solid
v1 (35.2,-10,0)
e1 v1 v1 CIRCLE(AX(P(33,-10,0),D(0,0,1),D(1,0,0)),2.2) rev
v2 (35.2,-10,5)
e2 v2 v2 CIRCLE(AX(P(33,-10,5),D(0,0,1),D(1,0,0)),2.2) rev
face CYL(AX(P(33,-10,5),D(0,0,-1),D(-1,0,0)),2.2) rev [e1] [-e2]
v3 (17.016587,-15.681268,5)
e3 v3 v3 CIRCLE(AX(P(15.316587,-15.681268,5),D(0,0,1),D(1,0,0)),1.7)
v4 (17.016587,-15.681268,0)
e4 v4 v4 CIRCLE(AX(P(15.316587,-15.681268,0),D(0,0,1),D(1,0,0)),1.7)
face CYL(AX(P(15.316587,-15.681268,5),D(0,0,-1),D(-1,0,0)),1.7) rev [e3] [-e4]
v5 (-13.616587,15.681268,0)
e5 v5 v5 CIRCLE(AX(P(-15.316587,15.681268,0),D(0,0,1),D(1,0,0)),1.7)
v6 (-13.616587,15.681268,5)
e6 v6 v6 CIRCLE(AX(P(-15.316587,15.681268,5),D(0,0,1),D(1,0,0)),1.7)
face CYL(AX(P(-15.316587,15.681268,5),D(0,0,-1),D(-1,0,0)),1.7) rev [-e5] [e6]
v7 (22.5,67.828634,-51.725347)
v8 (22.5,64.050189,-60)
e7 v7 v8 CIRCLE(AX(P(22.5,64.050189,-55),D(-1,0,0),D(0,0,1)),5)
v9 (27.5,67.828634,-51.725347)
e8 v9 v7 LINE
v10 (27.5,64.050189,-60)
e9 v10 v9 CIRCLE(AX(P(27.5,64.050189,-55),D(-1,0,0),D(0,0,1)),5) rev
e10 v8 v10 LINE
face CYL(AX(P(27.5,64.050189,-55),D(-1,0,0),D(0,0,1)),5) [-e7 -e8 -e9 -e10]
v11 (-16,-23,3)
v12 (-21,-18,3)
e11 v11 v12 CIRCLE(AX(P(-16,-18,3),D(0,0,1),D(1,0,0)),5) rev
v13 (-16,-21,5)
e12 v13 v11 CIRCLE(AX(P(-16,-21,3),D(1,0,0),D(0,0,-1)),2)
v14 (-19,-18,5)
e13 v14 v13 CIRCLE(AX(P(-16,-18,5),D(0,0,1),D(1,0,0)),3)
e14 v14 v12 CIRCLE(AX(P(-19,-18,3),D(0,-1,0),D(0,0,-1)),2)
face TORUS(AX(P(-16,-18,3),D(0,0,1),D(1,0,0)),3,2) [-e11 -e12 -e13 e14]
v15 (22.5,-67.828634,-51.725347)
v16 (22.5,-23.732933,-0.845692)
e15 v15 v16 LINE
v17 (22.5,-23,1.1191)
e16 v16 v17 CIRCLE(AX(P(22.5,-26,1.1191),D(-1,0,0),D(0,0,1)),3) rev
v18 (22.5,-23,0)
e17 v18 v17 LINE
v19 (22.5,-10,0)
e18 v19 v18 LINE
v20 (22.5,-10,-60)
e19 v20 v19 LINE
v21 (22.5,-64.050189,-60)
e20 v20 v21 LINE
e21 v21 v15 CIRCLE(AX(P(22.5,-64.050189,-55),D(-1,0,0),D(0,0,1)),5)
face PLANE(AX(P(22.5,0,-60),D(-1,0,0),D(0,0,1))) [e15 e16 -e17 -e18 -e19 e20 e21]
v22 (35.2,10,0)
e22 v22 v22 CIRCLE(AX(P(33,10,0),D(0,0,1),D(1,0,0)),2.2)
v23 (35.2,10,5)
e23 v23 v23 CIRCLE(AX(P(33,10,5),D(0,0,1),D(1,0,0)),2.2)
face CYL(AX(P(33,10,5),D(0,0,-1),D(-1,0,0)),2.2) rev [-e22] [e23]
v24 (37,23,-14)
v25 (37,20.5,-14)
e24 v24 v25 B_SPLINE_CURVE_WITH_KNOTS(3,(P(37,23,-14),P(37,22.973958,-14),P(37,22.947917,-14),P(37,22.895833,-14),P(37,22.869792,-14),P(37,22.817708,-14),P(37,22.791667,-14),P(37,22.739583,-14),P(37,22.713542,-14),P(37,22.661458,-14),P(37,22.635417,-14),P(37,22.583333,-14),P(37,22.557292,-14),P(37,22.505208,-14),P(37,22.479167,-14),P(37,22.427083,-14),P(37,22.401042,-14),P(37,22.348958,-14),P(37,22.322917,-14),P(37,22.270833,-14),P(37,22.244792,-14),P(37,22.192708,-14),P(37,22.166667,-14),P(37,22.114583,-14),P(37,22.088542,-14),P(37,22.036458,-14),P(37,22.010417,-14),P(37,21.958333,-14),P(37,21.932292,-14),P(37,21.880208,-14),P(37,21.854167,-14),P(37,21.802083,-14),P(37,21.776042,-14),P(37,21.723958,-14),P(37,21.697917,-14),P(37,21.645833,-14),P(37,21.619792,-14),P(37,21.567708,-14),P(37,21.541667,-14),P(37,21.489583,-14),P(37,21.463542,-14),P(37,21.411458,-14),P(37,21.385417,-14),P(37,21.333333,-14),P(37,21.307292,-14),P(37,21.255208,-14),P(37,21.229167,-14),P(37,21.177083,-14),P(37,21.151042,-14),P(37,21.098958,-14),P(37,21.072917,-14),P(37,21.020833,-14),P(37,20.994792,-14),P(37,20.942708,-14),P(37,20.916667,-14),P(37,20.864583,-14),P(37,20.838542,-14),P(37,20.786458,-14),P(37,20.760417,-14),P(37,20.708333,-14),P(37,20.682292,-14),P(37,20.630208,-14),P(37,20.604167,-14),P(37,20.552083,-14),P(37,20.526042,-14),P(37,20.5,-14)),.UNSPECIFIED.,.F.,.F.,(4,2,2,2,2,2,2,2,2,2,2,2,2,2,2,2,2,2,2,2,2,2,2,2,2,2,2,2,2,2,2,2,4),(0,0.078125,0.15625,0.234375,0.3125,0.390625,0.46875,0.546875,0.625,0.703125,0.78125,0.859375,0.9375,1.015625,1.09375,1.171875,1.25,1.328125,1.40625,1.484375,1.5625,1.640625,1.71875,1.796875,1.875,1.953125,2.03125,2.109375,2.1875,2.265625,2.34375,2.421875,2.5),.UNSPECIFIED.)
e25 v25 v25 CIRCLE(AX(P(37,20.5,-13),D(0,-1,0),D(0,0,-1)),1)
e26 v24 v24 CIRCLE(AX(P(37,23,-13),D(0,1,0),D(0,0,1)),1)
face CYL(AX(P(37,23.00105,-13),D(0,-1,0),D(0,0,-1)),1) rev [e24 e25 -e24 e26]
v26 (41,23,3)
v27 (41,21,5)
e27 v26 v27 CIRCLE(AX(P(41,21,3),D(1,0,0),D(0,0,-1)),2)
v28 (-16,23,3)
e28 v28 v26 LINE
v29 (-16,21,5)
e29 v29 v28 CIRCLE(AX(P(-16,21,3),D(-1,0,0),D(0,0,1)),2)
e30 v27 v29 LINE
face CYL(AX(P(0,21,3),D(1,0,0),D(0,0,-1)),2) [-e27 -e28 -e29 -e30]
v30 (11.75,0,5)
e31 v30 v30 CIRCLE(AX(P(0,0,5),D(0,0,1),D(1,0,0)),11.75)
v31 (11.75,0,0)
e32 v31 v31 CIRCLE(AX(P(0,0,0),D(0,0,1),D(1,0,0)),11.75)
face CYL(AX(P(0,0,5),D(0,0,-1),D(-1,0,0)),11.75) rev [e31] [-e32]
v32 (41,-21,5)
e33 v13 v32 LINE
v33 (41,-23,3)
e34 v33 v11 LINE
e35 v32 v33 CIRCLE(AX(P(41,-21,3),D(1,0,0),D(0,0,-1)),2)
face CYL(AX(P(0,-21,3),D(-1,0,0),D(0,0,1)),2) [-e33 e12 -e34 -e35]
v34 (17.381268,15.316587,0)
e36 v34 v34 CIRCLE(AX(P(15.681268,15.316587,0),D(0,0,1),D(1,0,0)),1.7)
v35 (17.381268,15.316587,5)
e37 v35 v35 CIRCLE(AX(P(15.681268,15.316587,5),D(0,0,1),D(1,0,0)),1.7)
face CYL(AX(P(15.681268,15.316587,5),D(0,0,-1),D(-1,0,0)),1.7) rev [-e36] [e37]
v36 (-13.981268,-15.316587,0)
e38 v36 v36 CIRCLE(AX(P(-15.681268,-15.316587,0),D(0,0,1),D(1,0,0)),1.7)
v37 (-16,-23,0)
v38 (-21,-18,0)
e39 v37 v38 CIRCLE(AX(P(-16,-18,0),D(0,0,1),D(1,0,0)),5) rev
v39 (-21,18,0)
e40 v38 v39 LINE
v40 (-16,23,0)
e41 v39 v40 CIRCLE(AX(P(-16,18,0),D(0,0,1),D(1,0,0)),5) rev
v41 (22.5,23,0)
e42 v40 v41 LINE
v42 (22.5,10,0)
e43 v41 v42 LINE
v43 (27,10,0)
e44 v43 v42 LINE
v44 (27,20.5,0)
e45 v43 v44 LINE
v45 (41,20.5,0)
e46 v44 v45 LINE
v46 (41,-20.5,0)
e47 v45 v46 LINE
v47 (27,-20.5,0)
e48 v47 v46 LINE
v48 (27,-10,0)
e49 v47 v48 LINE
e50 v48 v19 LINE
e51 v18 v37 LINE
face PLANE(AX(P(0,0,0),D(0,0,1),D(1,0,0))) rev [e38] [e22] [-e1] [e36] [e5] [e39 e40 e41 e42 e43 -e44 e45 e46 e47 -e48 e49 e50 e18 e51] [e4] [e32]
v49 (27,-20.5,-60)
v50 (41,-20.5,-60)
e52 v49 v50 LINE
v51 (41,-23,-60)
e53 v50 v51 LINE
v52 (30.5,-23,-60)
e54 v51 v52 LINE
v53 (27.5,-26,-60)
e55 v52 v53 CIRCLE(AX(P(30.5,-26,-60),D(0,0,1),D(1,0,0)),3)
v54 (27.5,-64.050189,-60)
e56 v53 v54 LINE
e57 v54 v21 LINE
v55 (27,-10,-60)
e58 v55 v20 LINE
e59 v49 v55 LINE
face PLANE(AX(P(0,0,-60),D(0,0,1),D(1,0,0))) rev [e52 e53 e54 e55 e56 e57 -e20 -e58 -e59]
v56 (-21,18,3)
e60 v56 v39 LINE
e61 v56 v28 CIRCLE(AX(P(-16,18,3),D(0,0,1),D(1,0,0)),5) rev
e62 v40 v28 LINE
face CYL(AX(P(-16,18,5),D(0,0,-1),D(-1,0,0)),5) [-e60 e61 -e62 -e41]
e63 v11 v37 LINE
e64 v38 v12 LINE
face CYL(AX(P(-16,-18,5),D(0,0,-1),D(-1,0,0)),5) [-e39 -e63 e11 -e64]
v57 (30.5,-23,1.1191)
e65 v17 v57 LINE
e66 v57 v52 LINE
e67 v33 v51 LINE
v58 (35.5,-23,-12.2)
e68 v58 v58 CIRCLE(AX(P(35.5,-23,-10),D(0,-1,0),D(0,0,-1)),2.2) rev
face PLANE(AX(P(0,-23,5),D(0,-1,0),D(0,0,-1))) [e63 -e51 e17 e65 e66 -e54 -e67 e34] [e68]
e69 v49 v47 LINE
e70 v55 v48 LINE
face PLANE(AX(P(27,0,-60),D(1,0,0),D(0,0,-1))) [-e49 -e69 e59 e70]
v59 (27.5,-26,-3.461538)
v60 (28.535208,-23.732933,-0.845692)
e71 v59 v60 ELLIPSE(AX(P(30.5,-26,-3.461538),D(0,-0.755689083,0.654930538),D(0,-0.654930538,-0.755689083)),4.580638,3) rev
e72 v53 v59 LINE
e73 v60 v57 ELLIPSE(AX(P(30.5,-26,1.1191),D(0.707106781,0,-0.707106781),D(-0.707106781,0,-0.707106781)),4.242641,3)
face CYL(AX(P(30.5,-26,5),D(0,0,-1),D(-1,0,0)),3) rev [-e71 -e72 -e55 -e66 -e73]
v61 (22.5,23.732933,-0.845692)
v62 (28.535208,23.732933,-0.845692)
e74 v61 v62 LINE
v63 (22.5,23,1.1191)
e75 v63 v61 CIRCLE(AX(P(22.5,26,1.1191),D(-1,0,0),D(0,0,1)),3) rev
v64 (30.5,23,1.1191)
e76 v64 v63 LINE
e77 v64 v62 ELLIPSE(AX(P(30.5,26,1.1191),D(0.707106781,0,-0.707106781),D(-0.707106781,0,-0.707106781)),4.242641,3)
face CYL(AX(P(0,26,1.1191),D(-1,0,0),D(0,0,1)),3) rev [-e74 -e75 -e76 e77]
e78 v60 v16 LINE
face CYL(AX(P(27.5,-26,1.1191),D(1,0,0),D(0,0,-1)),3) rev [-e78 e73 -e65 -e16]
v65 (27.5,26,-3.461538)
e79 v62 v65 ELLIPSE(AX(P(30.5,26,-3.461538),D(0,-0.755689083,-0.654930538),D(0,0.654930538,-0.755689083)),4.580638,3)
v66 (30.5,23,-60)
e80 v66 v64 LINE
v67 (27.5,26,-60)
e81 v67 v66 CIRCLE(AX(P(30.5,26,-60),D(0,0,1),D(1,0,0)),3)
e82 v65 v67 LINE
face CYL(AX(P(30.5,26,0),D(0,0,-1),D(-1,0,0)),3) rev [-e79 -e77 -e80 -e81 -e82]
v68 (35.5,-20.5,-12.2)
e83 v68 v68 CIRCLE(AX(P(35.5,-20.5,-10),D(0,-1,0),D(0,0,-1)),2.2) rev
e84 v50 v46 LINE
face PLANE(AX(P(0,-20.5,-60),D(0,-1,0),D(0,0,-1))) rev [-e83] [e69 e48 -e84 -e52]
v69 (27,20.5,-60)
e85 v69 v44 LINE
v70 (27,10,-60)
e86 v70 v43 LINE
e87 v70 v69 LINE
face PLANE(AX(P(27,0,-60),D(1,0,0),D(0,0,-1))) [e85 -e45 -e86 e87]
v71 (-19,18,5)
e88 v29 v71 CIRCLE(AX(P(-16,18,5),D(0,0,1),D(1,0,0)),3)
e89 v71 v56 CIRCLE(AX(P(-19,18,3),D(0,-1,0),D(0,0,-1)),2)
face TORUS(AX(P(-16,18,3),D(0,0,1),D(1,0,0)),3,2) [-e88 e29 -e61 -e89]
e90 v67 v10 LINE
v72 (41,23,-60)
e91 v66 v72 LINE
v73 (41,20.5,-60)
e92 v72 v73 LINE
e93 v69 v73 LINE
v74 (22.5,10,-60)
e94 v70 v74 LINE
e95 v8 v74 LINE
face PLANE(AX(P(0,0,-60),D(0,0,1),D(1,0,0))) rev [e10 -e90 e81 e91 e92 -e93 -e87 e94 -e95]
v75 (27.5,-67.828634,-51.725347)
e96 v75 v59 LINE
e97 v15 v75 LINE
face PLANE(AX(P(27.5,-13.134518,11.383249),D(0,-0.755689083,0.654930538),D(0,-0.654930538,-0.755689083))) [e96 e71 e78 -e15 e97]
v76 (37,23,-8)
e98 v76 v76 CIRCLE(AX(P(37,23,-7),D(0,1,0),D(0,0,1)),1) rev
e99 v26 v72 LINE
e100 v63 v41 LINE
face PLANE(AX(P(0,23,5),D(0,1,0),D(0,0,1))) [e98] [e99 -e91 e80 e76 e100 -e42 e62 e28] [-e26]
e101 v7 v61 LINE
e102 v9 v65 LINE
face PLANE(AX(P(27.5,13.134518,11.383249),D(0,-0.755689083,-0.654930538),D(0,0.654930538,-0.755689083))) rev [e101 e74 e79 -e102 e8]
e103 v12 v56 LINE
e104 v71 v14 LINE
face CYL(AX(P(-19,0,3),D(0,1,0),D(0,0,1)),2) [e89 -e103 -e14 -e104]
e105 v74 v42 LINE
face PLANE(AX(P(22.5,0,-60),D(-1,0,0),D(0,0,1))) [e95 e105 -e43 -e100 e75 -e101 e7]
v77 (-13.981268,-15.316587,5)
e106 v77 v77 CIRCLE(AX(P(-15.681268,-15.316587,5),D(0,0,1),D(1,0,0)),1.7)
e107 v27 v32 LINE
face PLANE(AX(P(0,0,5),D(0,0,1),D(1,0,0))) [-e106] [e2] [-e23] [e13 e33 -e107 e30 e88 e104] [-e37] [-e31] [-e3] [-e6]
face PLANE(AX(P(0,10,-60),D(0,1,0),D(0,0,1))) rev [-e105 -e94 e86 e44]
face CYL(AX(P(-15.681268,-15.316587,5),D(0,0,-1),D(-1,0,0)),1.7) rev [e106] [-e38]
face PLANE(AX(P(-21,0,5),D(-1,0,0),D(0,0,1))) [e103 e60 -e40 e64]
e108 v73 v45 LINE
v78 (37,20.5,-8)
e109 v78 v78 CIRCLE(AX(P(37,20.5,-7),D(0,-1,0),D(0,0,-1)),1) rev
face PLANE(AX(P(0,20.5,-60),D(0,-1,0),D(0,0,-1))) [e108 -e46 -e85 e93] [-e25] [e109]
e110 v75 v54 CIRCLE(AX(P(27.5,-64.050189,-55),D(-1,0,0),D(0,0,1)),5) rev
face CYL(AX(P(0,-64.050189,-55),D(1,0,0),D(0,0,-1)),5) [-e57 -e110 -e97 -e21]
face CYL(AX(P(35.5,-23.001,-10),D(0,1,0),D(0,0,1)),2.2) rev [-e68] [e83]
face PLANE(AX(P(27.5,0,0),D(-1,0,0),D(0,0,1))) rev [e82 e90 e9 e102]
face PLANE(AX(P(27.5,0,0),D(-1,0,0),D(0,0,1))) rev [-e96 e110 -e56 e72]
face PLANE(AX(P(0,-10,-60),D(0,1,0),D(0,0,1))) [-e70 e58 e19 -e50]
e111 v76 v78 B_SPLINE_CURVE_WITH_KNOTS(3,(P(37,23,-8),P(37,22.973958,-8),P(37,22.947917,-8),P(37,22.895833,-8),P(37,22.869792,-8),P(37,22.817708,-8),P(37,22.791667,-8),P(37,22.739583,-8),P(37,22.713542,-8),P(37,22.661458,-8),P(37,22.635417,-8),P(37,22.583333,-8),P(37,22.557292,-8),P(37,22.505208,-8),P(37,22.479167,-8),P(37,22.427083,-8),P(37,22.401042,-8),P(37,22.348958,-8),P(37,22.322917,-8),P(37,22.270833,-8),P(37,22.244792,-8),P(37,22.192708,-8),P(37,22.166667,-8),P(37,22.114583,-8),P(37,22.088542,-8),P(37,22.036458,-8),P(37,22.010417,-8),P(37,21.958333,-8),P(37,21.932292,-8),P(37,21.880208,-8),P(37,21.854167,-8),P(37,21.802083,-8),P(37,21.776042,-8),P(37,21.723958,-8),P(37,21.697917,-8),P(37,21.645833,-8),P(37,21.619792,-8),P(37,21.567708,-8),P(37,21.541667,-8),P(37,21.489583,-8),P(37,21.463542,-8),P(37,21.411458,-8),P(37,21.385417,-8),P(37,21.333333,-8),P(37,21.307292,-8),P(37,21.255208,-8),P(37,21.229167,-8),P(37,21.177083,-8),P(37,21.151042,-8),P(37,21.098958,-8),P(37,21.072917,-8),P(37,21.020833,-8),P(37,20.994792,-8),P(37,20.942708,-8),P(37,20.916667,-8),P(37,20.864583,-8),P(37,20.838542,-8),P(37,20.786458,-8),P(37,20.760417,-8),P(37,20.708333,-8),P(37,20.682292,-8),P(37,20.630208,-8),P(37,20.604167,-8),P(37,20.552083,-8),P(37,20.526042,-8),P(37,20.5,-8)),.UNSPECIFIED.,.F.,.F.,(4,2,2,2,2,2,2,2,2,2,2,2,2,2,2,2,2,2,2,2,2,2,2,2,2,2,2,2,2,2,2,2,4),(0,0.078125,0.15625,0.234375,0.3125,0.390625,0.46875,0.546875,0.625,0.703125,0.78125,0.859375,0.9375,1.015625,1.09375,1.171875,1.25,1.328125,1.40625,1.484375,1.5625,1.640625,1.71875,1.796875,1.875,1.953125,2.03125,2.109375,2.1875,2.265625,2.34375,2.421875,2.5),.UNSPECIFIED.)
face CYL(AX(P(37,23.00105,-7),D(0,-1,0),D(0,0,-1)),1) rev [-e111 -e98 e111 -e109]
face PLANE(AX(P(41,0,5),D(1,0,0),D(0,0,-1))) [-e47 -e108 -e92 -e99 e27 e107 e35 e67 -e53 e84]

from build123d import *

# Parameters (mm, degrees)
SKETCH_1_W          = 14
SKETCH_1_H          = 2.5
SKETCH_1_R          = 1.7
SKETCH_1_R_2        = 11.75
SKETCH_1_R_3        = 2.2
SKETCH_1_W_2        = 4.5
SKETCH_1_H_2        = 20
EXTRUDE_1_DEPTH     = 5
EXTRUDE_2_DEPTH     = 60
CUT_EXTRUDE_1_REACH = 78.223
CUT_EXTRUDE_2_REACH = 78.223
SKETCH_2_3_R        = 1
EXTRUDE_3_DEPTH     = 5
FILLET_1_R          = 5
FILLET_START        = 22.5
FILLET_2_DEPTH      = 5
FILLET_START_2      = -60
FILLET_2_2_DEPTH    = 61.119099979
FILLET_START_3      = 27.5
FILLET_2_3_DEPTH    = 3
FILLET_3_R          = 2


with BuildPart() as part:
    # 草图1 → 凸台-拉伸1 (new body)
    # profile 1 of 9: a face of its own
    with BuildSketch(Plane.XY):
        with Locations((34, 21.75)):
            Rectangle(SKETCH_1_W, SKETCH_1_H)
    # profile 2 of 9: a face of its own
    with BuildSketch(Plane.XY):
        Polygon((27, 23), (22.5, 23), (22.5, 21.5), (22.5, 10), (27, 10), (27, 20.5), align=None)
    # profile 3 of 9: a face of its own
    with BuildSketch(Plane.XY):
        Polygon((-21, 23), (-21, 21.5), (21, 21.5), (22.5, 21.5), (22.5, 23), align=None)
    # profile 4 of 9: a face of its own
    with BuildSketch(Plane.XY):
        Polygon((21, 21.5), (-21, 21.5), (-21, -21.5), (21, -21.5), (22.5, -21.5), (22.5, -10), (22.5, 10), (22.5, 21.5), align=None)
        with Locations((-15.68126777, -15.316587124)):
            Circle(SKETCH_1_R, mode=Mode.SUBTRACT)
        with Locations((15.316587124, -15.68126777)):
            Circle(SKETCH_1_R, mode=Mode.SUBTRACT)
        Circle(SKETCH_1_R_2, mode=Mode.SUBTRACT)
        with Locations((-15.316587124, 15.68126777)):
            Circle(SKETCH_1_R, mode=Mode.SUBTRACT)
        with Locations((15.68126777, 15.316587124)):
            Circle(SKETCH_1_R, mode=Mode.SUBTRACT)
    # profile 5 of 9: a face of its own
    with BuildSketch(Plane.XY):
        Polygon((41, 20.5), (27, 20.5), (27, 10), (27, -10), (27, -20.5), (41, -20.5), align=None)
        with Locations((33, -10)):
            Circle(SKETCH_1_R_3, mode=Mode.SUBTRACT)
        with Locations((33, 10)):
            Circle(SKETCH_1_R_3, mode=Mode.SUBTRACT)
    # profile 6 of 9: a face of its own
    with BuildSketch(Plane.XY):
        with Locations((24.75, 0)):
            Rectangle(SKETCH_1_W_2, SKETCH_1_H_2)
    # profile 7 of 9: a face of its own
    with BuildSketch(Plane.XY):
        Polygon((22.5, -10), (22.5, -21.5), (22.5, -23), (27, -23), (27, -20.5), (27, -10), align=None)
    # profile 8 of 9: a face of its own
    with BuildSketch(Plane.XY):
        with Locations((34, -21.75)):
            Rectangle(SKETCH_1_W, SKETCH_1_H)
    # profile 9 of 9: a face of its own
    with BuildSketch(Plane.XY):
        Polygon((21, -21.5), (-21, -21.5), (-21, -23), (22.5, -23), (22.5, -21.5), align=None)
    extrude(amount=EXTRUDE_1_DEPTH)

    # 草图1<4> → 凸台-拉伸2 (add)
    with BuildSketch(Plane.XY):
        Polygon((22.5, 23), (22.5, 10), (27, 10), (27, 20.5), (41, 20.5), (41, 23), align=None)
        Polygon((22.5, -10), (22.5, -23), (41, -23), (41, -20.5), (27, -20.5), (27, -10), align=None)
    extrude(amount=-EXTRUDE_2_DEPTH)

    # 草图2 → 切除-拉伸1 (cut, up to next)
    with BuildSketch(Plane(origin=(0, 0, 0), x_dir=(1, 0, 0), z_dir=(0, 1, 0)), mode=Mode.PRIVATE) as cut_extrude_1_sk1:
        with BuildLine():
            ThreePointArc((37.7, 10), (35.5, 12.2), (33.3, 10))
            Line((33.3, 10), (37.7, 10))
        make_face()
    cut_extrude_1_tool1 = extrude(cut_extrude_1_sk1.sketch, amount=-CUT_EXTRUDE_1_REACH, mode=Mode.PRIVATE) & part.part
    # 草图2 → 切除-拉伸1 (cut, up to next)
    with BuildSketch(Plane(origin=(0, 0, 0), x_dir=(1, 0, 0), z_dir=(0, 1, 0)), mode=Mode.PRIVATE) as cut_extrude_1_sk2:
        with BuildLine():
            Line((37.7, 10), (33.3, 10))
            ThreePointArc((33.3, 10), (35.5, 7.8), (37.7, 10))
        make_face()
    cut_extrude_1_tool2 = extrude(cut_extrude_1_sk2.sketch, amount=-CUT_EXTRUDE_1_REACH, mode=Mode.PRIVATE) & part.part
    # 草图2 → 切除-拉伸1 (cut, up to next)
    with BuildSketch(Plane(origin=(0, 0, 0), x_dir=(1, 0, 0), z_dir=(0, 1, 0)), mode=Mode.PRIVATE) as cut_extrude_1_sk3:
        with BuildLine():
            ThreePointArc((37.7, 10), (35.5, 12.2), (33.3, 10))
            Line((33.3, 10), (37.7, 10))
        make_face()
    cut_extrude_1_tool3 = extrude(cut_extrude_1_sk3.sketch, amount=-CUT_EXTRUDE_1_REACH, mode=Mode.PRIVATE) & part.part
    # 草图2 → 切除-拉伸1 (cut, up to next)
    with BuildSketch(Plane(origin=(0, 0, 0), x_dir=(1, 0, 0), z_dir=(0, 1, 0)), mode=Mode.PRIVATE) as cut_extrude_1_sk4:
        with BuildLine():
            Line((37.7, 10), (33.3, 10))
            ThreePointArc((33.3, 10), (35.5, 7.8), (37.7, 10))
        make_face()
    cut_extrude_1_tool4 = extrude(cut_extrude_1_sk4.sketch, amount=-CUT_EXTRUDE_1_REACH, mode=Mode.PRIVATE) & part.part
    add(cut_extrude_1_tool1.solids().sort_by_distance((35.5, 0, -10.933709))[0], mode=Mode.SUBTRACT)
    add(cut_extrude_1_tool2.solids().sort_by_distance((35.5, 0, -9.066291))[0], mode=Mode.SUBTRACT)
    add(cut_extrude_1_tool3.solids().sort_by_distance((35.5, 0, -10.933709))[0], mode=Mode.SUBTRACT)
    add(cut_extrude_1_tool4.solids().sort_by_distance((35.5, 0, -9.066291))[0], mode=Mode.SUBTRACT)

    # 草图2<3> → 切除-拉伸2 (cut, up to next)
    with BuildSketch(Plane(origin=(0, 0, 0), x_dir=(1, 0, 0), z_dir=(0, 1, 0)), mode=Mode.PRIVATE) as cut_extrude_2_sk1:
        with Locations(Location((37, 7, 0), (0, 0, 90))):
            Circle(SKETCH_2_3_R)
    cut_extrude_2_tool1 = extrude(cut_extrude_2_sk1.sketch, amount=CUT_EXTRUDE_2_REACH, mode=Mode.PRIVATE) & part.part
    # 草图2<3> → 切除-拉伸2 (cut, up to next)
    with BuildSketch(Plane(origin=(0, 0, 0), x_dir=(1, 0, 0), z_dir=(0, 1, 0)), mode=Mode.PRIVATE) as cut_extrude_2_sk2:
        with Locations(Location((37, 13, 0), (0, 0, 90))):
            Circle(SKETCH_2_3_R)
    cut_extrude_2_tool2 = extrude(cut_extrude_2_sk2.sketch, amount=CUT_EXTRUDE_2_REACH, mode=Mode.PRIVATE) & part.part
    add(cut_extrude_2_tool1.solids().sort_by_distance((37, 0, -7))[0], mode=Mode.SUBTRACT)
    add(cut_extrude_2_tool2.solids().sort_by_distance((37, 0, -13))[0], mode=Mode.SUBTRACT)

    # 草图5 → 凸台-拉伸3 (add)
    with BuildSketch(Plane.ZY.offset(-22.5)):
        Polygon((-60, 75), (-60, 23), (0, 23), align=None)
        Polygon((0, -23), (-60, -23), (-60, -75), align=None)
    extrude(amount=-EXTRUDE_3_DEPTH)

    # 圆角1
    fillet_1_edges = [part.edges().sort_by_distance(p)[0] for p in [
        (25, -75, -60),
        (25, 75, -60),
        (-21, -23, 2.5),
        (-21, 23, 2.5),
    ]]
    fillet(fillet_1_edges, radius=FILLET_1_R)

    # 圆角2: read off the stored shape, not the designer's step
    # 圆角2 outline → 圆角2 (add)
    with BuildSketch(Plane.YZ.offset(FILLET_START)):
        with BuildLine():
            ThreePointArc((-23, 1.119099979), (-23.189199247, 0.070577625), (-23.732932752, -0.845691636))
            Line((-23.732932752, -0.845691636), (-23, 0))
            Line((-23, 0), (-23, 1.119099979))
        make_face()
        with BuildLine():
            Line((23, 0), (23.732932752, -0.845691636))
            ThreePointArc((23.732932752, -0.845691636), (23.189199247, 0.070577625), (23, 1.119099979))
            Line((23, 1.119099979), (23, 0))
        make_face()
    extrude(amount=FILLET_2_DEPTH)

    # Fillet 2 2 outline → Fillet 2 2 (add)
    with BuildSketch(Plane.XY.offset(FILLET_START_2)):
        with BuildLine():
            Line((27.5, -23), (27.5, -26))
            ThreePointArc((27.5, -26), (28.378679656, -23.878679656), (30.5, -23))
            Line((30.5, -23), (27.5, -23))
        make_face()
        with BuildLine():
            Line((27.5, 23), (30.5, 23))
            ThreePointArc((30.5, 23), (28.378679656, 23.878679656), (27.5, 26))
            Line((27.5, 26), (27.5, 23))
        make_face()
    extrude(amount=FILLET_2_2_DEPTH)

    # Fillet 2 3 outline → Fillet 2 3 (cut)
    with BuildSketch(Plane.YZ.offset(FILLET_START_3)):
        with BuildLine():
            Line((-27.333333343, -5), (-23.732932752, -0.845691636))
            ThreePointArc((-23.732932752, -0.845691636), (-23.189199247, 0.070577625), (-23, 1.119099979))
            Line((-23, 1.119099979), (-28, 1.119099979))
            Line((-28, 1.119099979), (-28, -5))
            Line((-28, -5), (-27.333333343, -5))
        make_face()
        with BuildLine():
            Line((23.732932752, -0.845691636), (27.333333343, -5))
            Line((27.333333343, -5), (28, -5))
            Line((28, -5), (28, 1.119099979))
            Line((28, 1.119099979), (23, 1.119099979))
            ThreePointArc((23, 1.119099979), (23.189199247, 0.070577625), (23.732932752, -0.845691636))
        make_face()
    extrude(amount=FILLET_2_3_DEPTH, mode=Mode.SUBTRACT)

    # 圆角3
    fillet_3_edges = [part.edges().sort_by_distance(p)[0] for p in [
        (-21, 0, 5),
        (12.5, 23, 5),
        (-19.535533906, 21.535533906, 5),
        (-19.535533906, -21.535533906, 5),
        (12.5, -23, 5),
    ]]
    fillet(fillet_3_edges, radius=FILLET_3_R)


solid = part.part
